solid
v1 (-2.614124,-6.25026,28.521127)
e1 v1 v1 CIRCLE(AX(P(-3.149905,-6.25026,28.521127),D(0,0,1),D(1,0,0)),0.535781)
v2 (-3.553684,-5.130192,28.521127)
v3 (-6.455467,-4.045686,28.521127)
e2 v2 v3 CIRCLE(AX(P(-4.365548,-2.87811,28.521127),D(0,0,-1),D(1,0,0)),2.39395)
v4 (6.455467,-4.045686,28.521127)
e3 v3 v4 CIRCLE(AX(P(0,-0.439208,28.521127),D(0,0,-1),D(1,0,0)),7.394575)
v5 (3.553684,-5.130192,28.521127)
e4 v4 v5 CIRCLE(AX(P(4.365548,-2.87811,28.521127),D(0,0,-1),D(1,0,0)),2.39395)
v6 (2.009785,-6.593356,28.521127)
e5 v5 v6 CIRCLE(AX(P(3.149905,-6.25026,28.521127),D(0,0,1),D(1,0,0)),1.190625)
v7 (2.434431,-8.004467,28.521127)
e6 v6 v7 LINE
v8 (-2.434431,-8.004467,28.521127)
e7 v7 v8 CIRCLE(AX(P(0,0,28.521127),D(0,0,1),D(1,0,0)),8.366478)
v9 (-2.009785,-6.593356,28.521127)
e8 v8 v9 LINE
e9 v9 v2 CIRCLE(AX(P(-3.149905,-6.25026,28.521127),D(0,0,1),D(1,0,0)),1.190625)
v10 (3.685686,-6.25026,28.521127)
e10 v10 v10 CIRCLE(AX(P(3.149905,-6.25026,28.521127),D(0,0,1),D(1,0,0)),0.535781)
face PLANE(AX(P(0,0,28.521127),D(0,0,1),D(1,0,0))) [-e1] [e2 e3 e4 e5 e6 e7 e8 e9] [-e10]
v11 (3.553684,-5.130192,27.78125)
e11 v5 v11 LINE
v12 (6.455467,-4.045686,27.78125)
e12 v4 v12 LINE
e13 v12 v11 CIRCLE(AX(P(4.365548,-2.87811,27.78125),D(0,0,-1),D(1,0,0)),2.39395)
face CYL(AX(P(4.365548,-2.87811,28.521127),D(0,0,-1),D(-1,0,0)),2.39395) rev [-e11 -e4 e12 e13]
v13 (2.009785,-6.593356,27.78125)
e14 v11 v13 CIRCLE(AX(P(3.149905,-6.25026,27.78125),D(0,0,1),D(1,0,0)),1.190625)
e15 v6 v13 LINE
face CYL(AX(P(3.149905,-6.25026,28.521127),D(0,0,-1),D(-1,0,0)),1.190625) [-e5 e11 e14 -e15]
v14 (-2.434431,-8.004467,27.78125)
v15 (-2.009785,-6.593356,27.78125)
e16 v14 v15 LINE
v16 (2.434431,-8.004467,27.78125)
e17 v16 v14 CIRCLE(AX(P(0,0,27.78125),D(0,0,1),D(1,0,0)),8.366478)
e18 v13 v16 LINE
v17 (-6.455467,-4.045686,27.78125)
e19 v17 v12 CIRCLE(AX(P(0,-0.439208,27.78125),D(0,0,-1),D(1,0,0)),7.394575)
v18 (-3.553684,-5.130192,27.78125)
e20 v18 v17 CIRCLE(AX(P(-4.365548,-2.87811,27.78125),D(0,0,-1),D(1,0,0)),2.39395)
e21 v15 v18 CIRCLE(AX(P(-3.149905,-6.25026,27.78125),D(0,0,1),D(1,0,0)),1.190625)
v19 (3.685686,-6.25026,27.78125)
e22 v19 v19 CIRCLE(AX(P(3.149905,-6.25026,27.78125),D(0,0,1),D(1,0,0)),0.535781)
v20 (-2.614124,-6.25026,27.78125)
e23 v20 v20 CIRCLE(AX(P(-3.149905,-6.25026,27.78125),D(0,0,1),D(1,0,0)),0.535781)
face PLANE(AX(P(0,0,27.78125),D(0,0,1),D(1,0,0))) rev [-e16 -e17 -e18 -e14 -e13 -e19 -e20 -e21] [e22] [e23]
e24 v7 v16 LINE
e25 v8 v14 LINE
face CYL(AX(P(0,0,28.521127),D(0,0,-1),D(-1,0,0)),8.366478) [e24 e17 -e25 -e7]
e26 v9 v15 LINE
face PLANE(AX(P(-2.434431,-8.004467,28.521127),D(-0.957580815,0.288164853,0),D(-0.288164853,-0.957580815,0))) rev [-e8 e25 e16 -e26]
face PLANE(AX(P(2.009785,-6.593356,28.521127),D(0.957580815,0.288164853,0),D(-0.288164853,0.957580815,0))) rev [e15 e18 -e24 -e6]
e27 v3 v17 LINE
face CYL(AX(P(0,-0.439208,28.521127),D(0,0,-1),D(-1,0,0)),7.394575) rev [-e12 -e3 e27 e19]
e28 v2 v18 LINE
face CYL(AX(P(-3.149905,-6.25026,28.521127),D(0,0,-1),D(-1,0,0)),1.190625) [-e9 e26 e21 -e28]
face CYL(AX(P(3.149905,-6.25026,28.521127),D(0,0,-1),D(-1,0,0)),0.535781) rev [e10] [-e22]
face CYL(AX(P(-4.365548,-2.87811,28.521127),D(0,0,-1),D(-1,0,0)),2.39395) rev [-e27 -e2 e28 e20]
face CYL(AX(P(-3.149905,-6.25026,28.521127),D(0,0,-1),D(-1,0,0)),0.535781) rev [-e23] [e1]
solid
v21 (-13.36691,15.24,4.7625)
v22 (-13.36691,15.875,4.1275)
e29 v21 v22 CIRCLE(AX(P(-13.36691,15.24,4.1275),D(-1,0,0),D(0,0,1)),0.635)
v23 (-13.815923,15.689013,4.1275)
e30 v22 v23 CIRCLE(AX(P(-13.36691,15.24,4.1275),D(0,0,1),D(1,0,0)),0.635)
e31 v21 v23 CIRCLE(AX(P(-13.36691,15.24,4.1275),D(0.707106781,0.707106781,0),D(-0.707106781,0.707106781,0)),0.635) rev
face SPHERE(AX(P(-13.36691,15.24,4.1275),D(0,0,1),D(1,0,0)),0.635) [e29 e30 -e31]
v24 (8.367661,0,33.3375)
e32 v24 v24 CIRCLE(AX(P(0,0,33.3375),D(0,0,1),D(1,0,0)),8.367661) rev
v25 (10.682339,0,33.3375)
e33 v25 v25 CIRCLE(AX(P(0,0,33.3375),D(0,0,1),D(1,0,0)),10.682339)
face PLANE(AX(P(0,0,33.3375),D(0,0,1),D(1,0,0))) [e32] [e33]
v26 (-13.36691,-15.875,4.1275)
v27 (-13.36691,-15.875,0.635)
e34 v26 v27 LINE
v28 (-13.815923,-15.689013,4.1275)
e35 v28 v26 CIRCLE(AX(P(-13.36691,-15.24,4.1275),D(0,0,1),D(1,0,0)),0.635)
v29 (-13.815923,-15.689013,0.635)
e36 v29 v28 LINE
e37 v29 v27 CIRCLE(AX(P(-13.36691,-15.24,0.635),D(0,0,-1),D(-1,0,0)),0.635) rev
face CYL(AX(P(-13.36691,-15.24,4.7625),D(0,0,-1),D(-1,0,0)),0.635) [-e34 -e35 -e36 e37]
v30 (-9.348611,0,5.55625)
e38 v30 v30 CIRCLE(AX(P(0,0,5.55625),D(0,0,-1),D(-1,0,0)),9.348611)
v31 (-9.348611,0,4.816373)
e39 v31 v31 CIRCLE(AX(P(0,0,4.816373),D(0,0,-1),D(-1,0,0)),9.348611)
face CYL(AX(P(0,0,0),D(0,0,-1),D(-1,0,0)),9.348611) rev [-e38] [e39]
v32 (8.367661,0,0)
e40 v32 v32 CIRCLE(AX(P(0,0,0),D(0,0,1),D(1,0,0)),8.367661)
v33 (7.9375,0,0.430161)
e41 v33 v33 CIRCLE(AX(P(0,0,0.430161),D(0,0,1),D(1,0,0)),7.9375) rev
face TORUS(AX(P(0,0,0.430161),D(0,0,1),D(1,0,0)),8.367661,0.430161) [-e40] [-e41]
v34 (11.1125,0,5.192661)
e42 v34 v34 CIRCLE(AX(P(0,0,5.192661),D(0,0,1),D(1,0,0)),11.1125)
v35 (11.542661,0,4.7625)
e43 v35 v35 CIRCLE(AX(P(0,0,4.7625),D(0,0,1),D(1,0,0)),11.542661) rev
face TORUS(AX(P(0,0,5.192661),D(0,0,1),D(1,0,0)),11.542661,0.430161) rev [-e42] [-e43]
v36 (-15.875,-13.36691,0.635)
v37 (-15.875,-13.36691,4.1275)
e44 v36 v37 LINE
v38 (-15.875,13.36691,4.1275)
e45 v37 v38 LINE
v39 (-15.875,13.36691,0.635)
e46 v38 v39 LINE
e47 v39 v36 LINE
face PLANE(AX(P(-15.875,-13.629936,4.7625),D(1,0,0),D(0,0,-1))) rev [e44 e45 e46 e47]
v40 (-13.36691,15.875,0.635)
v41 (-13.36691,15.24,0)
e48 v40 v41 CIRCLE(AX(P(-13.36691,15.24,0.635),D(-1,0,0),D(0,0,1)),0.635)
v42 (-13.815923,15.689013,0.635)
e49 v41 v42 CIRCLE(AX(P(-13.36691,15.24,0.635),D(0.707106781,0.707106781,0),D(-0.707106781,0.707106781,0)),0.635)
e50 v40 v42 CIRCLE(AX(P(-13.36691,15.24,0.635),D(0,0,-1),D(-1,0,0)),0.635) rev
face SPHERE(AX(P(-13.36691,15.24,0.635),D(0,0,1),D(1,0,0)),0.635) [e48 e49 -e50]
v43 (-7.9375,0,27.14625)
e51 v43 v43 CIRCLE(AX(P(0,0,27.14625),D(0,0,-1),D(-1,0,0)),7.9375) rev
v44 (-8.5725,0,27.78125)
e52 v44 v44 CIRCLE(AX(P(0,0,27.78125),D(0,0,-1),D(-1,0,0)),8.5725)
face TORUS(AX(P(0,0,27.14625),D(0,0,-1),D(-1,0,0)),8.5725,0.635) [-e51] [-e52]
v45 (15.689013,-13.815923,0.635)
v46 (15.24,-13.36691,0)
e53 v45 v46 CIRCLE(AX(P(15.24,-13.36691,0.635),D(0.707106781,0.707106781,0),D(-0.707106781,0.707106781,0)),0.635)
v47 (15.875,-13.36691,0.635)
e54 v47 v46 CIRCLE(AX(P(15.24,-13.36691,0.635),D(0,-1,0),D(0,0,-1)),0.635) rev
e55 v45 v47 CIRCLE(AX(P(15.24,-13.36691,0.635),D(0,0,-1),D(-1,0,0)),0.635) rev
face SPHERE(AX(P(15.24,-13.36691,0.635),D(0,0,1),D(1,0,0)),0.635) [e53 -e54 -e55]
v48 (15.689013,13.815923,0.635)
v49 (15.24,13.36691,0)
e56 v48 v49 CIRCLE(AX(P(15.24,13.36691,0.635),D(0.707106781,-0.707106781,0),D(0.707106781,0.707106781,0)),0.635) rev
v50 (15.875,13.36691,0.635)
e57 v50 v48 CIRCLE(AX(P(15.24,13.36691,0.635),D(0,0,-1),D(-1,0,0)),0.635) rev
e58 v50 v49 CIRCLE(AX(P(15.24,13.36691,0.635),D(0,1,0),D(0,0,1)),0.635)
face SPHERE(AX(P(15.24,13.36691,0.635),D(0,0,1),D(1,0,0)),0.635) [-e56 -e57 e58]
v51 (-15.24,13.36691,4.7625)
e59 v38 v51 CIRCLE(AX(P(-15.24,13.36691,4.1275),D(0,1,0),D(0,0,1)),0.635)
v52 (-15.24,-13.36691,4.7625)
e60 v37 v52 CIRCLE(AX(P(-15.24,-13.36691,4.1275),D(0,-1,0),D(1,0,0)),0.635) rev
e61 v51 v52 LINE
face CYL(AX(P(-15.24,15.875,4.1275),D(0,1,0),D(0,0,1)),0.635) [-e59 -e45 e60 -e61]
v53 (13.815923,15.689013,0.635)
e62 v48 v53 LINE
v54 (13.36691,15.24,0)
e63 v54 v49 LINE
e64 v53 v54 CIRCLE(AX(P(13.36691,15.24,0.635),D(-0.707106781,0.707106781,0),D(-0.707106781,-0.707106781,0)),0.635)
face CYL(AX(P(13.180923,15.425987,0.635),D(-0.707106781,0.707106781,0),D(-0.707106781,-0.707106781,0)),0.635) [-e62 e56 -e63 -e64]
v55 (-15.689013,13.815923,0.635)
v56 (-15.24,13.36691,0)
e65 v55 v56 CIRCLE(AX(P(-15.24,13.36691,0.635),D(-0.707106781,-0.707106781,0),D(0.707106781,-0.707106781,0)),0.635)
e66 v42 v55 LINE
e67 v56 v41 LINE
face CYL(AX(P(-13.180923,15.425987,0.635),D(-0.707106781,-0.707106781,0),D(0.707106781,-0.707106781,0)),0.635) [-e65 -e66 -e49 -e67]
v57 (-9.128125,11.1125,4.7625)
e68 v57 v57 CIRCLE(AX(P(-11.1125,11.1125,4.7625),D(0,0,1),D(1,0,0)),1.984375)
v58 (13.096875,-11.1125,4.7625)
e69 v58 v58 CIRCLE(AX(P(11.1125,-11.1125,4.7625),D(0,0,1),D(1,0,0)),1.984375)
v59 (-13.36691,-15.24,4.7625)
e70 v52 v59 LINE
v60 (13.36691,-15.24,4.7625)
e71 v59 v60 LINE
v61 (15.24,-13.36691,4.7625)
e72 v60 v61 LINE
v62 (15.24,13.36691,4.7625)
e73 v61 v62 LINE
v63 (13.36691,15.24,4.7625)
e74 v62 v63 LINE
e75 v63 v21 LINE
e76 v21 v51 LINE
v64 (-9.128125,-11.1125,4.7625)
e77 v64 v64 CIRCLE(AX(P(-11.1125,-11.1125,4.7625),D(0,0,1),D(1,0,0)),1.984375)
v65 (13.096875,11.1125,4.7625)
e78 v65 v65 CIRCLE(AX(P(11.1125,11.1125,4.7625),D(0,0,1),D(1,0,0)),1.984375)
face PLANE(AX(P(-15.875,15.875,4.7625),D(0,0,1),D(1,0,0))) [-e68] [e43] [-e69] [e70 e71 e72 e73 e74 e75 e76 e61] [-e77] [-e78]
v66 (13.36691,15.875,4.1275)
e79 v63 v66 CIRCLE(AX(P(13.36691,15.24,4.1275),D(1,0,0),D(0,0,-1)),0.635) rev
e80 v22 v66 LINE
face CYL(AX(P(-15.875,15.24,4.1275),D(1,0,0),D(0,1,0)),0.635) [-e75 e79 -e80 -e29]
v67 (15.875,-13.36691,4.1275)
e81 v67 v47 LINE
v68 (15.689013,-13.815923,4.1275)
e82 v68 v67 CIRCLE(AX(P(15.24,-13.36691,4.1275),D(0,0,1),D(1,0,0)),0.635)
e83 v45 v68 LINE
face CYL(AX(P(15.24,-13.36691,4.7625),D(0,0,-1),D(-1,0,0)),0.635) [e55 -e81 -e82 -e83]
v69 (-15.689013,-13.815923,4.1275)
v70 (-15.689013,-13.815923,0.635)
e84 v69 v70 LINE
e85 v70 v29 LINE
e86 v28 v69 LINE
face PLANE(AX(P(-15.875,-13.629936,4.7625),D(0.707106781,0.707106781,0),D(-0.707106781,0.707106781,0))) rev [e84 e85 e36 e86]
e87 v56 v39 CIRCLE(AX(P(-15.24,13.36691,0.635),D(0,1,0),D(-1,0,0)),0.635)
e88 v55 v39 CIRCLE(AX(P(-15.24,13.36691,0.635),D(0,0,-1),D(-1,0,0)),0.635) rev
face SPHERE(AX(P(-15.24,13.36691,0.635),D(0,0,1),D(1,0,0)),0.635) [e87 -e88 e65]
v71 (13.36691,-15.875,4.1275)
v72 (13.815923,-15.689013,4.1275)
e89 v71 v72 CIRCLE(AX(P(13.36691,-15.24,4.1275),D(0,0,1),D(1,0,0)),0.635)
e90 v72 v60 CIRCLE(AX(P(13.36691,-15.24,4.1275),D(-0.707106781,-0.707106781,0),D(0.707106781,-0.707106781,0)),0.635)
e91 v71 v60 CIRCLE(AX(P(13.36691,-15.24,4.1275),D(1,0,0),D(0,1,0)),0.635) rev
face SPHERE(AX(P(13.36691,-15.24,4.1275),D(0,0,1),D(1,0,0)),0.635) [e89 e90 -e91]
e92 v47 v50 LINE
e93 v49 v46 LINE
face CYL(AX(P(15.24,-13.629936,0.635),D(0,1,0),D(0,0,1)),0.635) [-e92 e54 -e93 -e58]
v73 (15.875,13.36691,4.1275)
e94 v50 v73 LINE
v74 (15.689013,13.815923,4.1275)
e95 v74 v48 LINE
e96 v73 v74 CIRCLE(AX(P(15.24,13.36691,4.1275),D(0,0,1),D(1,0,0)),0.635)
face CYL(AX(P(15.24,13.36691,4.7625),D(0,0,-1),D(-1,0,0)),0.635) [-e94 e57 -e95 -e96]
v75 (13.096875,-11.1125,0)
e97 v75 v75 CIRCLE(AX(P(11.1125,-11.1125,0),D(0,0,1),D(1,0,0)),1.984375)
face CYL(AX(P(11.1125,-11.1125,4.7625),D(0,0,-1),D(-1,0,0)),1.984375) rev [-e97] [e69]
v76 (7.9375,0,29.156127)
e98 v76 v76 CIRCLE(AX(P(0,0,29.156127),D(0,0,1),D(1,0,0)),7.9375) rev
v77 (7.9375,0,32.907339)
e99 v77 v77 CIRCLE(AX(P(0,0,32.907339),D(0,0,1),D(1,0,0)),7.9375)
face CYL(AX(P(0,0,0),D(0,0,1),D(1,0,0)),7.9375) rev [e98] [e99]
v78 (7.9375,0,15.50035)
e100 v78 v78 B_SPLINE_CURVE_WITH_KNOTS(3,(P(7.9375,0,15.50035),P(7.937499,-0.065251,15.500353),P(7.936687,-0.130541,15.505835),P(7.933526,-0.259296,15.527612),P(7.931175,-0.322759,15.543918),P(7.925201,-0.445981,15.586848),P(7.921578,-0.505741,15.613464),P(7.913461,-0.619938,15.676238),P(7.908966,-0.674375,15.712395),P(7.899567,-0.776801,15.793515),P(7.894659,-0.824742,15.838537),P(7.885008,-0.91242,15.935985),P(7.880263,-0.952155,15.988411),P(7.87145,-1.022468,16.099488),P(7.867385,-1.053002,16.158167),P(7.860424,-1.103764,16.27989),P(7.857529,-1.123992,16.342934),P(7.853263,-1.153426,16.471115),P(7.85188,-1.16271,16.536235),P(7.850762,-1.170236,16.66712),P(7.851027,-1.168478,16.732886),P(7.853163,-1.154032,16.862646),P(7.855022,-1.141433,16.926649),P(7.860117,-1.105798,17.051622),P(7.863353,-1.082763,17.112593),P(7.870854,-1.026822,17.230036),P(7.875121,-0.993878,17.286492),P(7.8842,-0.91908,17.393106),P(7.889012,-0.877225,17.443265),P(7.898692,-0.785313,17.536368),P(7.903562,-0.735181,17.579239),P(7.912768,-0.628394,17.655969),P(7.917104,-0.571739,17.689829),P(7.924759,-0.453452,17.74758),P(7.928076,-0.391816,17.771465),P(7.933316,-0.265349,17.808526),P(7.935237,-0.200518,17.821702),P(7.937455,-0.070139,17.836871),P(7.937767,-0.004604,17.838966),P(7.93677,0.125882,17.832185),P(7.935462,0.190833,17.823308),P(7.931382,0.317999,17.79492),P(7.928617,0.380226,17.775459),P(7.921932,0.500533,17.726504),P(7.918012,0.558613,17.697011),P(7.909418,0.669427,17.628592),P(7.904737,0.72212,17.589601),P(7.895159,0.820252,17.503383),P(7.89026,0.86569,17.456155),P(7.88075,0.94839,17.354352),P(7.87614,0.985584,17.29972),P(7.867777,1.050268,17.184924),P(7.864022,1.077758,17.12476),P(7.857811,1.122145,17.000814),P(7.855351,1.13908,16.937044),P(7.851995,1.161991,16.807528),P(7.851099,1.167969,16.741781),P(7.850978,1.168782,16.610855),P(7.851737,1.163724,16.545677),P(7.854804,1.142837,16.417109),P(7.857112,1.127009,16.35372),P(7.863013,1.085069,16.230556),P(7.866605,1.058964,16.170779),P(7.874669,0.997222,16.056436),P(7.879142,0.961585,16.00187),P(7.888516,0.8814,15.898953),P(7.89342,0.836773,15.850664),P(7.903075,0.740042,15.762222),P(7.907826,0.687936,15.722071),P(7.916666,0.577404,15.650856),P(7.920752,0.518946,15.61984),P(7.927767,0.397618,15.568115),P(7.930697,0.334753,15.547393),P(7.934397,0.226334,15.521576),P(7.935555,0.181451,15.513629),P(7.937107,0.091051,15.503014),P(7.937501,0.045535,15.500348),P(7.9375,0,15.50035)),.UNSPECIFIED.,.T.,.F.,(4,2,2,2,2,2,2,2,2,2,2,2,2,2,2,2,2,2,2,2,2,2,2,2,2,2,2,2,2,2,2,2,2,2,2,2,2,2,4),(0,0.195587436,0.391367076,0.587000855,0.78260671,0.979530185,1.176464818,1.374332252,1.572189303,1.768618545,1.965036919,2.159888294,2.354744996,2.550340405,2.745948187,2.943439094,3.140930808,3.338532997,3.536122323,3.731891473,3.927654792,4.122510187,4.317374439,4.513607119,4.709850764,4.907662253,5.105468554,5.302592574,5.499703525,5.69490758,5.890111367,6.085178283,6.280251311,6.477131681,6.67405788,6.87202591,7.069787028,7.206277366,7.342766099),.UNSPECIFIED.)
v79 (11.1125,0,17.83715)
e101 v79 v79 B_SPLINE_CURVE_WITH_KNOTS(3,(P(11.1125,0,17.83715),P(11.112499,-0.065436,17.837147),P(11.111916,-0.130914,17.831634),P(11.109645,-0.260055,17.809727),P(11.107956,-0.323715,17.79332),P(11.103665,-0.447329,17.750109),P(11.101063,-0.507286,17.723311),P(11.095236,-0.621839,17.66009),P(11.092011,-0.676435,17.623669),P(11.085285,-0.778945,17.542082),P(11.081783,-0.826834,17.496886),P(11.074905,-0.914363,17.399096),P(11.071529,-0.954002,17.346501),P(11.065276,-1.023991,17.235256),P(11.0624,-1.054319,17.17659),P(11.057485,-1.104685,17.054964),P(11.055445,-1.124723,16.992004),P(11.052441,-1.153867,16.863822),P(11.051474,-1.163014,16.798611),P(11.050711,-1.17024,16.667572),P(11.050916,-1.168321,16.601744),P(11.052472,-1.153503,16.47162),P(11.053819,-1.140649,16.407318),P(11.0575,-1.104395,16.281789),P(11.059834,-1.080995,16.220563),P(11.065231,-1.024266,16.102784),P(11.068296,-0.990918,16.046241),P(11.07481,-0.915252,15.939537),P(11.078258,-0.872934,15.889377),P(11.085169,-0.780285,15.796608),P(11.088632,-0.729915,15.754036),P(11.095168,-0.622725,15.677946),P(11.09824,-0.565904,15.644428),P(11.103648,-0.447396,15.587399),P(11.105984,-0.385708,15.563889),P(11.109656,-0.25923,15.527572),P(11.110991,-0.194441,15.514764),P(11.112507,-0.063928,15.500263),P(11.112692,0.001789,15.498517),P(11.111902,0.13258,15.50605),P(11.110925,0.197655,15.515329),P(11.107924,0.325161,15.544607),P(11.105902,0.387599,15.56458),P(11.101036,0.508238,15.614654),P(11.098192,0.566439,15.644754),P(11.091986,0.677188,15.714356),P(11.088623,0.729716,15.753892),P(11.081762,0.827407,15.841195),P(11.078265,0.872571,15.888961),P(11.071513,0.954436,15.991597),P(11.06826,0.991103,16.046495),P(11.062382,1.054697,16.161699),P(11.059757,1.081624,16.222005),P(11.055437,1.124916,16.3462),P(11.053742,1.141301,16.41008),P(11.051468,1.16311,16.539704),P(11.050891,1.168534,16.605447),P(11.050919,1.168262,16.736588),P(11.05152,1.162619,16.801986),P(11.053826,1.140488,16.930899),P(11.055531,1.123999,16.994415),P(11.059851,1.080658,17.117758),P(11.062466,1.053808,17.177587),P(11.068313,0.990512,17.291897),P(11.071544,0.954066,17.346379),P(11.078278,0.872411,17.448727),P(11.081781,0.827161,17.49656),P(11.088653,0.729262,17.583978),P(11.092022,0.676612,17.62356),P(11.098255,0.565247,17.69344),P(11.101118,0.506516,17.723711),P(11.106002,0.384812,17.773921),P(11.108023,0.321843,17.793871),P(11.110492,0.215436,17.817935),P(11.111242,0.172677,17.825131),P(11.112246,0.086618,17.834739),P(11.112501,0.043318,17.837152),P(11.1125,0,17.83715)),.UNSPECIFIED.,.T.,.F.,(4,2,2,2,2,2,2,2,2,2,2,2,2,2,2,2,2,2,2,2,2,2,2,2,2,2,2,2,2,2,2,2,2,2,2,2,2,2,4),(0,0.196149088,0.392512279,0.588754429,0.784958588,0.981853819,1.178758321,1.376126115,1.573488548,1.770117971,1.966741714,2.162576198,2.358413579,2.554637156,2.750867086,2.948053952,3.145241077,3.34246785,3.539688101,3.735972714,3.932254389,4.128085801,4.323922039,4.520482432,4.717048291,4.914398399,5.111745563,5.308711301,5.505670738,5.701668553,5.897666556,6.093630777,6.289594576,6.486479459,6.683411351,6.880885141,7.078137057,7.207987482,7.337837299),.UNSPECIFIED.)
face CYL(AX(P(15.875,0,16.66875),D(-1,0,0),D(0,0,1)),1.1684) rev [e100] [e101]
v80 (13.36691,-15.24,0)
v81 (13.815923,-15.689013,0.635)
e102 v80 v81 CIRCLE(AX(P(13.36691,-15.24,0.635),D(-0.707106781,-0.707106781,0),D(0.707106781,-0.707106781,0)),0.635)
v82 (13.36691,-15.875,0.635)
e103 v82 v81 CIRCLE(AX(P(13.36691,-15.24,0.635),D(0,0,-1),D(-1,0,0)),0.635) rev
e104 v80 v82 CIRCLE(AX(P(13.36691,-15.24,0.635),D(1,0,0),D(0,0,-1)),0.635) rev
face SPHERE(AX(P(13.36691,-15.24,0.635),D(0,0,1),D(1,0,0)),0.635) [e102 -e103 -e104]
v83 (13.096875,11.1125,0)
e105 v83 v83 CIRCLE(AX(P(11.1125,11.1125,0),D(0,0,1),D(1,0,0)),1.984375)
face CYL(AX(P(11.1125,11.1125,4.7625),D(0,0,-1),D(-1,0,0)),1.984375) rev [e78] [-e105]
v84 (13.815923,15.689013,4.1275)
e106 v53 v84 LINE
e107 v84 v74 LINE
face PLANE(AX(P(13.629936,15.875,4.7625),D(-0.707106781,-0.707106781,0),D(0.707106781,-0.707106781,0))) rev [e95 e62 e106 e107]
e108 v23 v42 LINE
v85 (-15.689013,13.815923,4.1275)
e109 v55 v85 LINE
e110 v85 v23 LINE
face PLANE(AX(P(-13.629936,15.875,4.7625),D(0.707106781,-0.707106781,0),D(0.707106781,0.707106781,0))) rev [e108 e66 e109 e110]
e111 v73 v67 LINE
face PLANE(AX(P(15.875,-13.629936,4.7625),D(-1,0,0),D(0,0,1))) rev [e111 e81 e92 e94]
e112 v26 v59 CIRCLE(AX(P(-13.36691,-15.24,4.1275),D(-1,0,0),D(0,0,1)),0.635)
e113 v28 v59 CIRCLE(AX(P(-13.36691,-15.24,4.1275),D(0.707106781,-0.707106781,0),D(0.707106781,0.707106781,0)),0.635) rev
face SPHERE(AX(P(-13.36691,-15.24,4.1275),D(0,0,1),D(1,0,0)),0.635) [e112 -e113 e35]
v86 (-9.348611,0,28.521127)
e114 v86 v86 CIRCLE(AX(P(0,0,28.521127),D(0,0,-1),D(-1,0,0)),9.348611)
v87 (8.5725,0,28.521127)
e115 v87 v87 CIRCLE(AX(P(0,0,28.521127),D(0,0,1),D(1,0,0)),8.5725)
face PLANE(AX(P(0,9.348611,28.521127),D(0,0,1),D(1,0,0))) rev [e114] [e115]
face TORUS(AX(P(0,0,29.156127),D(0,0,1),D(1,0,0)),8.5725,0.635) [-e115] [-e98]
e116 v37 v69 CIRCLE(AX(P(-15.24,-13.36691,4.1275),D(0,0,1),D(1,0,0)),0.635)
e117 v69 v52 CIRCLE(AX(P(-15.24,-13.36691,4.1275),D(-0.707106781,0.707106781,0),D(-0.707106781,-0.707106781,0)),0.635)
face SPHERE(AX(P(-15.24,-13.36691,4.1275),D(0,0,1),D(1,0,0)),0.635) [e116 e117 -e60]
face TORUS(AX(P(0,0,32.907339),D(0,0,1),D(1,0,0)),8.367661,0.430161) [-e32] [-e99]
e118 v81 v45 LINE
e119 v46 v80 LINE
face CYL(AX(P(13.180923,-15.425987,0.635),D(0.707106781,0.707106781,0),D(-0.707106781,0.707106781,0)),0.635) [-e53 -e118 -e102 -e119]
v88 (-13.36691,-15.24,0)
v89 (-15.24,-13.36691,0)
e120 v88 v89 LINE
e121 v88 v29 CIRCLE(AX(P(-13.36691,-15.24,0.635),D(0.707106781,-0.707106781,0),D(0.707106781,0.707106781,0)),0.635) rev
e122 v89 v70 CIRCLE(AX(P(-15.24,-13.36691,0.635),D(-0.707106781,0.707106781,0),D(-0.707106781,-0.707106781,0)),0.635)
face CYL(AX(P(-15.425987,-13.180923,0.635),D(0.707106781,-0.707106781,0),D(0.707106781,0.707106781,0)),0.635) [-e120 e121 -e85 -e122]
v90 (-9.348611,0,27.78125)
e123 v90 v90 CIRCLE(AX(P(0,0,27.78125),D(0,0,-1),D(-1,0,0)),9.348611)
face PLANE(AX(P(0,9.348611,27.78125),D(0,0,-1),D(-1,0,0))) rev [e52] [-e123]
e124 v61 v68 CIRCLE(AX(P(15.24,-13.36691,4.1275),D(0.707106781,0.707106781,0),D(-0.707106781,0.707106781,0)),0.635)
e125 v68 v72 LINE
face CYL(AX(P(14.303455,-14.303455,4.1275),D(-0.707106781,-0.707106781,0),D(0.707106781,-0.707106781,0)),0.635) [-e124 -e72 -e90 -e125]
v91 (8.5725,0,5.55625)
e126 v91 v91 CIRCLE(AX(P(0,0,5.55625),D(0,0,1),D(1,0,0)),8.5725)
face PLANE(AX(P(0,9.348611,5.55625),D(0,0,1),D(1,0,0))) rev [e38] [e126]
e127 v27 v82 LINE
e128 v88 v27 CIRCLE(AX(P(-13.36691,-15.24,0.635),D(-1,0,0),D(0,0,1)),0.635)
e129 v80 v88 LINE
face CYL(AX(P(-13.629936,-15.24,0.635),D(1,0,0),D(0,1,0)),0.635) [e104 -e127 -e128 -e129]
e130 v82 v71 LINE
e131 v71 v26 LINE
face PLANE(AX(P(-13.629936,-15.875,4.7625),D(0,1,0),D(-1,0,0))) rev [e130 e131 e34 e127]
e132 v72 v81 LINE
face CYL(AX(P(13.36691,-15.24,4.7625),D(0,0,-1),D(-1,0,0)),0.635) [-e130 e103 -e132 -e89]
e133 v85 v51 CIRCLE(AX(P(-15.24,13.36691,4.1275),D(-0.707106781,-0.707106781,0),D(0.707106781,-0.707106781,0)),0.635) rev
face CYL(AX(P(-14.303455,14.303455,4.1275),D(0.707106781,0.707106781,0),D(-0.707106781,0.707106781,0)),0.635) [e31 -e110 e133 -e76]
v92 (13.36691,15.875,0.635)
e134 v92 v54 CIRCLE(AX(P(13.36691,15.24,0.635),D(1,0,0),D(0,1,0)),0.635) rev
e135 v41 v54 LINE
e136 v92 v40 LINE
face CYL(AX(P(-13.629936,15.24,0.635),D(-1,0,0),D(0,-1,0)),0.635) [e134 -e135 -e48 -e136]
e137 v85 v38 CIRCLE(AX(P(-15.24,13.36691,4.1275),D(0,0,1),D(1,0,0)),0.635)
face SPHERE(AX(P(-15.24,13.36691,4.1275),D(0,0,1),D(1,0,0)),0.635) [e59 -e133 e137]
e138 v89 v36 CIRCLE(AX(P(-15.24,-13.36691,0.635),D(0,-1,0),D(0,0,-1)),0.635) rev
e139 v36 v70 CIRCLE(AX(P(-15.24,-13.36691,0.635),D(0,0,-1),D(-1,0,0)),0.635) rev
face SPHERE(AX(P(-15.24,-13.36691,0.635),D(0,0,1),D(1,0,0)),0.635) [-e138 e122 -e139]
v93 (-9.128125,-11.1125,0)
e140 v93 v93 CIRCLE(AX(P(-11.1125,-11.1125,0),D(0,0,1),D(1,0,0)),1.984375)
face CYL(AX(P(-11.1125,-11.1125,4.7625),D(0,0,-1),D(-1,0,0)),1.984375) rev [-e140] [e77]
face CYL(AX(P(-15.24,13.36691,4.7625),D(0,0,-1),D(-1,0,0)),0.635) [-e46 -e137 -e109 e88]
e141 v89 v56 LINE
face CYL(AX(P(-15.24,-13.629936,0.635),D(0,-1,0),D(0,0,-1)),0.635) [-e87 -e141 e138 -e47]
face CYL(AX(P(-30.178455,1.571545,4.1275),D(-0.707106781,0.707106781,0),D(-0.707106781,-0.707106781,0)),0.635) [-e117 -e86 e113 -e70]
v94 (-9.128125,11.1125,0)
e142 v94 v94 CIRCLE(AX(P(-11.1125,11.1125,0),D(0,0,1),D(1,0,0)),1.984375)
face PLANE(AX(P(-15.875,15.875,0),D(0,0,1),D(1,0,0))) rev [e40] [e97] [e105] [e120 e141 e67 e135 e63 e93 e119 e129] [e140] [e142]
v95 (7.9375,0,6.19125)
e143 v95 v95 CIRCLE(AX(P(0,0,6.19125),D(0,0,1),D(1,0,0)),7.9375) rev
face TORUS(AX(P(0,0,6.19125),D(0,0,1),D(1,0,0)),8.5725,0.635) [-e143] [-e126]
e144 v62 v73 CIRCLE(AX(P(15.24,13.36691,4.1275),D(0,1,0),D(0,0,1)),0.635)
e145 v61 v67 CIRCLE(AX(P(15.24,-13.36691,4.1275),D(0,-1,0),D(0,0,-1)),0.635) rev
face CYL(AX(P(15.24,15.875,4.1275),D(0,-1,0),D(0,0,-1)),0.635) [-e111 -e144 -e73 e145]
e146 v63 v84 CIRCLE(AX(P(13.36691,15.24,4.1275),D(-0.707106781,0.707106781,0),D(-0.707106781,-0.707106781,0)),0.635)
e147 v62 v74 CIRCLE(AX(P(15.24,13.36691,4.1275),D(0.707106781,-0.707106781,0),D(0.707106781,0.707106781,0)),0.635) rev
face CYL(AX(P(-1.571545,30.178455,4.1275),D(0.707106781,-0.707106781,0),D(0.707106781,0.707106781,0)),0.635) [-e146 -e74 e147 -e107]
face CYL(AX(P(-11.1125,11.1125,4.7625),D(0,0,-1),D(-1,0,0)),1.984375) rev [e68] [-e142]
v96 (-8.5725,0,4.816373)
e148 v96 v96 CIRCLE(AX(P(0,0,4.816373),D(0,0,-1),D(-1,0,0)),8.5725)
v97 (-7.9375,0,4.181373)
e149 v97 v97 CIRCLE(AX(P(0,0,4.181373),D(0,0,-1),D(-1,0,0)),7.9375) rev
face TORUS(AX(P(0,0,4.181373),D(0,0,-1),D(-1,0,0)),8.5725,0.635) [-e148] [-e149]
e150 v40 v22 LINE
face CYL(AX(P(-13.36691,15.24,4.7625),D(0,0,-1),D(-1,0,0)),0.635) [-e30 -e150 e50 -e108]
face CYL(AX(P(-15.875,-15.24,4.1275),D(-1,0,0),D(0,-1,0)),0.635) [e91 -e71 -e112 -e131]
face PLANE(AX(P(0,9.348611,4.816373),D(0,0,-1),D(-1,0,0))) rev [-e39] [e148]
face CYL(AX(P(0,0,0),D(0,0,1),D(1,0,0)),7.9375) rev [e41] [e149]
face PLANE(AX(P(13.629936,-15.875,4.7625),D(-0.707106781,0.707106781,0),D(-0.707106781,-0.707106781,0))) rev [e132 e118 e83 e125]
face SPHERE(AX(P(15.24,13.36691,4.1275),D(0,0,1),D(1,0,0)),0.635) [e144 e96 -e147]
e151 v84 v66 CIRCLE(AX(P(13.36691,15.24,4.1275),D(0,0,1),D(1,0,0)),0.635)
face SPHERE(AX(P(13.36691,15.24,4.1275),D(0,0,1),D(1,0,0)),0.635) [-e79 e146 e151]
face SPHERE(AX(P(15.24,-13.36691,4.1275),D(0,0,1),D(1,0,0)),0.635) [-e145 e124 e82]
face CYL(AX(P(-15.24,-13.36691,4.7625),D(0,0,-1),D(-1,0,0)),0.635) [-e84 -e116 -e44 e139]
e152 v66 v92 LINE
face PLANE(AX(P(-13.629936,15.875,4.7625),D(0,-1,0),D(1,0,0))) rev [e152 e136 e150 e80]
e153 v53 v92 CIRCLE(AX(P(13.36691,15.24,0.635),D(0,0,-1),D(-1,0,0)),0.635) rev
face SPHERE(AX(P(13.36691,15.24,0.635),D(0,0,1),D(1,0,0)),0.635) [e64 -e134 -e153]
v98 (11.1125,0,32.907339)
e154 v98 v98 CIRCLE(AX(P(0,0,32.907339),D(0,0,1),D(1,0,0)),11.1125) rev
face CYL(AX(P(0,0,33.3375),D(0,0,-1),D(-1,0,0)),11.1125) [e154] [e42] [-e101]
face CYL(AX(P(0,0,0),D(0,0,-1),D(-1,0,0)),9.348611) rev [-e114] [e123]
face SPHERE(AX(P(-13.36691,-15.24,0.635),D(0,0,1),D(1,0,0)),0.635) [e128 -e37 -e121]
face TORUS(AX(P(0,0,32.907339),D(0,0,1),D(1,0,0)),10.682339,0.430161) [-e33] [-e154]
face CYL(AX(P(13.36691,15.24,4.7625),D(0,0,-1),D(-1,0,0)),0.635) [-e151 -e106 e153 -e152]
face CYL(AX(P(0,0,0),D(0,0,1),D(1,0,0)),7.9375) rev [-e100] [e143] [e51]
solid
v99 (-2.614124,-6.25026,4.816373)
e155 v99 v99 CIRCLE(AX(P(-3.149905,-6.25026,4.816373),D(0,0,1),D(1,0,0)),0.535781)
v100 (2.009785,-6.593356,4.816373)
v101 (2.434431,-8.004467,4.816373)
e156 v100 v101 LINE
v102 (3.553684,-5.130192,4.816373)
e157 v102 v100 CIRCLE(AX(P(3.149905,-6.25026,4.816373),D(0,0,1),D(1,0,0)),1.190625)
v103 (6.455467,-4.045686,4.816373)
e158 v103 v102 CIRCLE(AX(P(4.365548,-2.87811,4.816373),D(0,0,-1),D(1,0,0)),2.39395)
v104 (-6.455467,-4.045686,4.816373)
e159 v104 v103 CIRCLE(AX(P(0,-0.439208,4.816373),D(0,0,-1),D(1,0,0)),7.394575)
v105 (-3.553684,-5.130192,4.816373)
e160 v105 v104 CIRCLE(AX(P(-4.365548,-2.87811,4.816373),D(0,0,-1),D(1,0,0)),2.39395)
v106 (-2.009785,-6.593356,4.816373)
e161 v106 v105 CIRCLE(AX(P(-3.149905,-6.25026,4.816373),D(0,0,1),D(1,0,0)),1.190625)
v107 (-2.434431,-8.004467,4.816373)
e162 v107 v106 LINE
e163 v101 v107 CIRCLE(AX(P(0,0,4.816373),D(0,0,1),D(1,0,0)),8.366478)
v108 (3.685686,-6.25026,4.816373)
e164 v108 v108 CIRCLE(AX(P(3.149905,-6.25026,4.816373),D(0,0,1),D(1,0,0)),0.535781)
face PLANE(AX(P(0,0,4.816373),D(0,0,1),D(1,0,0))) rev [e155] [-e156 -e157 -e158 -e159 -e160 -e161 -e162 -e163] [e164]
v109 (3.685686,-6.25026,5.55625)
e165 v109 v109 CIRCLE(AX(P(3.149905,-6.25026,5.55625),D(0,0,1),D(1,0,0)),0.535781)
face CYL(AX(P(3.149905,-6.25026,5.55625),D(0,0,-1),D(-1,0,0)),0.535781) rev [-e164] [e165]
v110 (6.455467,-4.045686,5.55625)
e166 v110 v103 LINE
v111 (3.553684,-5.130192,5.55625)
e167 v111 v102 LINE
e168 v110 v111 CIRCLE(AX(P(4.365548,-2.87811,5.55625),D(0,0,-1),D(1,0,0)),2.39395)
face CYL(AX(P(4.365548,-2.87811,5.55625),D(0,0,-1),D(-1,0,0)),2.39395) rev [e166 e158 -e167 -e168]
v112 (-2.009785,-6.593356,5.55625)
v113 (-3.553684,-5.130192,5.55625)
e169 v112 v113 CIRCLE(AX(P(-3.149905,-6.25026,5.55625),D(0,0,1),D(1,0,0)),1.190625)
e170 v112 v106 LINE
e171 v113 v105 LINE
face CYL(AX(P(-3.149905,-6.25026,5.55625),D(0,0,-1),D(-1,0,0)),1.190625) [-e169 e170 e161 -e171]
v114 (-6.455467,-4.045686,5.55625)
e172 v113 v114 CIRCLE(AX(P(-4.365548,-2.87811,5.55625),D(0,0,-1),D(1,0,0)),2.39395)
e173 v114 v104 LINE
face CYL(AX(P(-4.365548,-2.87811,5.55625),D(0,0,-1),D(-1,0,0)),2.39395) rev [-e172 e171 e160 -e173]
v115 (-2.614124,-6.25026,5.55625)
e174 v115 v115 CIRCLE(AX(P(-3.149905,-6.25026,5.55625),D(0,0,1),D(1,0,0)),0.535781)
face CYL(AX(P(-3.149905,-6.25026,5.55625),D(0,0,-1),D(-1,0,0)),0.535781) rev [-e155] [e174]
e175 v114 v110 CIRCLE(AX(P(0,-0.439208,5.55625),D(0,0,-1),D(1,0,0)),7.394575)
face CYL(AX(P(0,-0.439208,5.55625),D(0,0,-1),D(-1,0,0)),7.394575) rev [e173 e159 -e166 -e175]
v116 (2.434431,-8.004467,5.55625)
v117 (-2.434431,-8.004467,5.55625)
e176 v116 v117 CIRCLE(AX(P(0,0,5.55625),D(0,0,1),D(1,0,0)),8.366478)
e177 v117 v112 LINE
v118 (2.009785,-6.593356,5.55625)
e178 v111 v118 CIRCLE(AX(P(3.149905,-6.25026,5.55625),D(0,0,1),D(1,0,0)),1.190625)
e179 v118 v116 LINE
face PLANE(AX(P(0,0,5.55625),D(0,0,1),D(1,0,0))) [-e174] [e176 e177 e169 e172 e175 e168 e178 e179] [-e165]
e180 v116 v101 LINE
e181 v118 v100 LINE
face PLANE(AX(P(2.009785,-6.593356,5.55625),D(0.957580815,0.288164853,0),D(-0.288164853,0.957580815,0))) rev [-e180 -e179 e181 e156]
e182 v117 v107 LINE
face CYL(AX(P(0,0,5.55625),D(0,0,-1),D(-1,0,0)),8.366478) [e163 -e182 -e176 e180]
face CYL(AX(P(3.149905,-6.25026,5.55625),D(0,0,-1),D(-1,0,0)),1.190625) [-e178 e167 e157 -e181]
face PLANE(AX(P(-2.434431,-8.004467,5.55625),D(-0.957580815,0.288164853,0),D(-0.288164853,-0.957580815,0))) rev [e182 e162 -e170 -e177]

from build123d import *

# Parameters (mm, degrees)
SKETCH1_R                 = 1.984375
BASE_DEPTH                = 4.7625
SKETCH2_R                 = 11.1125
TUBE_DEPTH                = 33.3375
SKETCH3_R                 = 7.9375
ID_CUT_DEPTH              = 41.192289761
FILLET1_R                 = 0.43016143
FILLET2_R                 = 0.635
SKETCH4_W                 = 0.739877473
SKETCH4_H                 = 9.348611129
FILLET7_R                 = 0.635
SKETCH7_R                 = 0.53578125
BOSS_EXTRUDE1_DEPTH       = 0.739877
SKETCH_PATTERN1_START     = 4.816372527
SKETCH_PATTERN1_OUTLINE_R = 0.53578125
SKETCH_PATTERN1_DEPTH     = 0.739877473
SKETCH6_R                 = 1.1684
ZERK_HOLE_DEPTH           = 41.192289761


# Read off the part's stored shape, not the designer's step: Sketch-Pattern1
with BuildPart() as part:
    # Sketch1 → Base (new body)
    with BuildSketch(Plane.XY):
        Polygon((-13.62993597, 15.875), (-15.875, 13.62993597), (-15.875, -13.62993597), (-13.62993597, -15.875), (13.62993597, -15.875), (15.875, -13.62993597), (15.875, 13.62993597), (13.62993597, 15.875), align=None)
        with Locations((-11.1125, 11.1125)):
            Circle(SKETCH1_R, mode=Mode.SUBTRACT)
        with Locations((-11.1125, -11.1125)):
            Circle(SKETCH1_R, mode=Mode.SUBTRACT)
        with Locations((11.1125, -11.1125)):
            Circle(SKETCH1_R, mode=Mode.SUBTRACT)
        with Locations((11.1125, 11.1125)):
            Circle(SKETCH1_R, mode=Mode.SUBTRACT)
    extrude(amount=BASE_DEPTH)

    # Sketch2 → Tube (add)
    with BuildSketch(Plane.XY):
        Circle(SKETCH2_R)
    extrude(amount=TUBE_DEPTH)

    # Sketch3 → ID Cut (cut, through all)
    with BuildSketch(Plane.XY.offset(33.3375)):
        Circle(SKETCH3_R)
    extrude(amount=-ID_CUT_DEPTH, mode=Mode.SUBTRACT)

    # Fillet1
    fillet1_edges = [part.edges().sort_by_distance(p)[0] for p in [
        (-11.1125, 0, 4.7625),
        (-11.1125, 0, 33.3375),
        (-7.9375, 0, 0),
        (-7.9375, 0, 33.3375),
    ]]
    fillet(fillet1_edges, radius=FILLET1_R)

    # Fillet2
    fillet2_edges = [part.edges().sort_by_distance(p)[0] for p in [
        (-15.875, 0, 4.7625),
        (-14.752467985, 14.752467985, 0),
        (0, 15.875, 0),
        (-14.752467985, -14.752467985, 4.7625),
        (13.62993597, 15.875, 2.38125),
        (15.875, 13.62993597, 2.38125),
        (15.875, -13.62993597, 2.38125),
        (13.62993597, -15.875, 2.38125),
        (-13.62993597, -15.875, 2.38125),
        (-15.875, -13.62993597, 2.38125),
        (-15.875, 13.62993597, 2.38125),
        (-13.62993597, 15.875, 2.38125),
        (0, -15.875, 4.7625),
        (14.752467985, -14.752467985, 4.7625),
        (15.875, 0, 4.7625),
        (14.752467985, 14.752467985, 4.7625),
        (0, 15.875, 4.7625),
        (-14.752467985, 14.752467985, 4.7625),
        (14.752467985, 14.752467985, 0),
        (15.875, 0, 0),
        (14.752467985, -14.752467985, 0),
        (0, -15.875, 0),
        (-14.752467985, -14.752467985, 0),
        (-15.875, 0, 0),
    ]]
    fillet(fillet2_edges, radius=FILLET2_R)

    # Sketch4 → Retaining Ring Cut (revolve, cut)
    with BuildSketch(Plane(origin=(0, 0, 0), x_dir=(0, 0, -1), z_dir=(1, 0, 0)), mode=Mode.PRIVATE) as retaining_ring_cut_sk:
        with Locations((-28.151188737, 4.674305565)):
            Rectangle(SKETCH4_W, SKETCH4_H)
        with Locations((-5.186311264, 4.674305565)):
            Rectangle(SKETCH4_W, SKETCH4_H)
    revolve(retaining_ring_cut_sk.sketch.rotate(Axis((0, 0, 0), (0, 0, 1)), 270), axis=Axis((0, 0, 0), (0, 0, 1)), mode=Mode.SUBTRACT)

    # Fillet7
    fillet7_edges = [part.edges().sort_by_distance(p)[0] for p in [
        (-7.9375, 0, 28.521127473),
        (-7.9375, 0, 27.78125),
        (-7.9375, 0, 5.55625),
        (-7.9375, 0, 4.816372527),
    ]]
    fillet(fillet7_edges, radius=FILLET7_R)

    # Sketch6 → Zerk Hole (cut, through all)
    with BuildSketch(Plane(origin=(0, 0, 0), x_dir=(0, 0, -1), z_dir=(1, 0, 0))):
        with Locations(Location((-16.66875, 0, 0), (0, 0, 180))):
            Circle(SKETCH6_R)
    extrude(amount=ZERK_HOLE_DEPTH, mode=Mode.SUBTRACT)


with BuildPart() as body_2:
    # Sketch7 → Boss-Extrude1 (new body)
    with BuildSketch(Plane.XY.offset(27.78125)):
        with BuildLine():
            Line((2.009785492, -6.593356051), (2.43443125, -8.00446718))
            ThreePointArc((2.43443125, -8.00446718), (0, 8.366477774), (-2.43443125, -8.00446718))
            Line((-2.43443125, -8.00446718), (-2.009785492, -6.593356051))
            ThreePointArc((-2.009785492, -6.593356051), (-2.330904854, -5.386068588), (-3.553683685, -5.13019246))
            ThreePointArc((-3.553683685, -5.13019246), (-5.203637624, -5.120564893), (-6.455467083, -4.045686438))
            ThreePointArc((-6.455467083, -4.045686438), (0, 6.955366646), (6.455467083, -4.045686438))
            ThreePointArc((6.455467083, -4.045686438), (5.203637624, -5.120564893), (3.553683685, -5.13019246))
            ThreePointArc((3.553683685, -5.13019246), (2.330904854, -5.386068588), (2.009785492, -6.593356051))
        make_face()
        with Locations((-3.14990515, -6.250259773)):
            Circle(SKETCH7_R, mode=Mode.SUBTRACT)
        with Locations((3.14990515, -6.250259773)):
            Circle(SKETCH7_R, mode=Mode.SUBTRACT)
    extrude(amount=BOSS_EXTRUDE1_DEPTH)


with BuildPart() as body_3:
    # Sketch-Pattern1 outline → Sketch-Pattern1 (new body)
    with BuildSketch(Plane.XY.offset(SKETCH_PATTERN1_START)):
        with BuildLine():
            ThreePointArc((2.43443125, -8.00446718), (0, 8.366477774), (-2.43443125, -8.00446718))
            Line((-2.43443125, -8.00446718), (-2.009785492, -6.593356051))
            ThreePointArc((-2.009785492, -6.593356051), (-2.330904854, -5.386068588), (-3.553683685, -5.13019246))
            ThreePointArc((-3.553683685, -5.13019246), (-5.203637623, -5.120564893), (-6.455467083, -4.045686438))
            ThreePointArc((-6.455467083, -4.045686438), (0, 6.955366646), (6.455467083, -4.045686438))
            ThreePointArc((6.455467083, -4.045686438), (5.203637623, -5.120564893), (3.553683685, -5.13019246))
            ThreePointArc((3.553683685, -5.13019246), (2.330904854, -5.386068588), (2.009785492, -6.593356051))
            Line((2.009785492, -6.593356051), (2.43443125, -8.00446718))
        make_face()
        with Locations((-3.14990515, -6.250259773)):
            Circle(SKETCH_PATTERN1_OUTLINE_R, mode=Mode.SUBTRACT)
        with Locations((3.14990515, -6.250259773)):
            Circle(SKETCH_PATTERN1_OUTLINE_R, mode=Mode.SUBTRACT)
    extrude(amount=SKETCH_PATTERN1_DEPTH)


solid = Compound([part.part, body_2.part, body_3.part])
